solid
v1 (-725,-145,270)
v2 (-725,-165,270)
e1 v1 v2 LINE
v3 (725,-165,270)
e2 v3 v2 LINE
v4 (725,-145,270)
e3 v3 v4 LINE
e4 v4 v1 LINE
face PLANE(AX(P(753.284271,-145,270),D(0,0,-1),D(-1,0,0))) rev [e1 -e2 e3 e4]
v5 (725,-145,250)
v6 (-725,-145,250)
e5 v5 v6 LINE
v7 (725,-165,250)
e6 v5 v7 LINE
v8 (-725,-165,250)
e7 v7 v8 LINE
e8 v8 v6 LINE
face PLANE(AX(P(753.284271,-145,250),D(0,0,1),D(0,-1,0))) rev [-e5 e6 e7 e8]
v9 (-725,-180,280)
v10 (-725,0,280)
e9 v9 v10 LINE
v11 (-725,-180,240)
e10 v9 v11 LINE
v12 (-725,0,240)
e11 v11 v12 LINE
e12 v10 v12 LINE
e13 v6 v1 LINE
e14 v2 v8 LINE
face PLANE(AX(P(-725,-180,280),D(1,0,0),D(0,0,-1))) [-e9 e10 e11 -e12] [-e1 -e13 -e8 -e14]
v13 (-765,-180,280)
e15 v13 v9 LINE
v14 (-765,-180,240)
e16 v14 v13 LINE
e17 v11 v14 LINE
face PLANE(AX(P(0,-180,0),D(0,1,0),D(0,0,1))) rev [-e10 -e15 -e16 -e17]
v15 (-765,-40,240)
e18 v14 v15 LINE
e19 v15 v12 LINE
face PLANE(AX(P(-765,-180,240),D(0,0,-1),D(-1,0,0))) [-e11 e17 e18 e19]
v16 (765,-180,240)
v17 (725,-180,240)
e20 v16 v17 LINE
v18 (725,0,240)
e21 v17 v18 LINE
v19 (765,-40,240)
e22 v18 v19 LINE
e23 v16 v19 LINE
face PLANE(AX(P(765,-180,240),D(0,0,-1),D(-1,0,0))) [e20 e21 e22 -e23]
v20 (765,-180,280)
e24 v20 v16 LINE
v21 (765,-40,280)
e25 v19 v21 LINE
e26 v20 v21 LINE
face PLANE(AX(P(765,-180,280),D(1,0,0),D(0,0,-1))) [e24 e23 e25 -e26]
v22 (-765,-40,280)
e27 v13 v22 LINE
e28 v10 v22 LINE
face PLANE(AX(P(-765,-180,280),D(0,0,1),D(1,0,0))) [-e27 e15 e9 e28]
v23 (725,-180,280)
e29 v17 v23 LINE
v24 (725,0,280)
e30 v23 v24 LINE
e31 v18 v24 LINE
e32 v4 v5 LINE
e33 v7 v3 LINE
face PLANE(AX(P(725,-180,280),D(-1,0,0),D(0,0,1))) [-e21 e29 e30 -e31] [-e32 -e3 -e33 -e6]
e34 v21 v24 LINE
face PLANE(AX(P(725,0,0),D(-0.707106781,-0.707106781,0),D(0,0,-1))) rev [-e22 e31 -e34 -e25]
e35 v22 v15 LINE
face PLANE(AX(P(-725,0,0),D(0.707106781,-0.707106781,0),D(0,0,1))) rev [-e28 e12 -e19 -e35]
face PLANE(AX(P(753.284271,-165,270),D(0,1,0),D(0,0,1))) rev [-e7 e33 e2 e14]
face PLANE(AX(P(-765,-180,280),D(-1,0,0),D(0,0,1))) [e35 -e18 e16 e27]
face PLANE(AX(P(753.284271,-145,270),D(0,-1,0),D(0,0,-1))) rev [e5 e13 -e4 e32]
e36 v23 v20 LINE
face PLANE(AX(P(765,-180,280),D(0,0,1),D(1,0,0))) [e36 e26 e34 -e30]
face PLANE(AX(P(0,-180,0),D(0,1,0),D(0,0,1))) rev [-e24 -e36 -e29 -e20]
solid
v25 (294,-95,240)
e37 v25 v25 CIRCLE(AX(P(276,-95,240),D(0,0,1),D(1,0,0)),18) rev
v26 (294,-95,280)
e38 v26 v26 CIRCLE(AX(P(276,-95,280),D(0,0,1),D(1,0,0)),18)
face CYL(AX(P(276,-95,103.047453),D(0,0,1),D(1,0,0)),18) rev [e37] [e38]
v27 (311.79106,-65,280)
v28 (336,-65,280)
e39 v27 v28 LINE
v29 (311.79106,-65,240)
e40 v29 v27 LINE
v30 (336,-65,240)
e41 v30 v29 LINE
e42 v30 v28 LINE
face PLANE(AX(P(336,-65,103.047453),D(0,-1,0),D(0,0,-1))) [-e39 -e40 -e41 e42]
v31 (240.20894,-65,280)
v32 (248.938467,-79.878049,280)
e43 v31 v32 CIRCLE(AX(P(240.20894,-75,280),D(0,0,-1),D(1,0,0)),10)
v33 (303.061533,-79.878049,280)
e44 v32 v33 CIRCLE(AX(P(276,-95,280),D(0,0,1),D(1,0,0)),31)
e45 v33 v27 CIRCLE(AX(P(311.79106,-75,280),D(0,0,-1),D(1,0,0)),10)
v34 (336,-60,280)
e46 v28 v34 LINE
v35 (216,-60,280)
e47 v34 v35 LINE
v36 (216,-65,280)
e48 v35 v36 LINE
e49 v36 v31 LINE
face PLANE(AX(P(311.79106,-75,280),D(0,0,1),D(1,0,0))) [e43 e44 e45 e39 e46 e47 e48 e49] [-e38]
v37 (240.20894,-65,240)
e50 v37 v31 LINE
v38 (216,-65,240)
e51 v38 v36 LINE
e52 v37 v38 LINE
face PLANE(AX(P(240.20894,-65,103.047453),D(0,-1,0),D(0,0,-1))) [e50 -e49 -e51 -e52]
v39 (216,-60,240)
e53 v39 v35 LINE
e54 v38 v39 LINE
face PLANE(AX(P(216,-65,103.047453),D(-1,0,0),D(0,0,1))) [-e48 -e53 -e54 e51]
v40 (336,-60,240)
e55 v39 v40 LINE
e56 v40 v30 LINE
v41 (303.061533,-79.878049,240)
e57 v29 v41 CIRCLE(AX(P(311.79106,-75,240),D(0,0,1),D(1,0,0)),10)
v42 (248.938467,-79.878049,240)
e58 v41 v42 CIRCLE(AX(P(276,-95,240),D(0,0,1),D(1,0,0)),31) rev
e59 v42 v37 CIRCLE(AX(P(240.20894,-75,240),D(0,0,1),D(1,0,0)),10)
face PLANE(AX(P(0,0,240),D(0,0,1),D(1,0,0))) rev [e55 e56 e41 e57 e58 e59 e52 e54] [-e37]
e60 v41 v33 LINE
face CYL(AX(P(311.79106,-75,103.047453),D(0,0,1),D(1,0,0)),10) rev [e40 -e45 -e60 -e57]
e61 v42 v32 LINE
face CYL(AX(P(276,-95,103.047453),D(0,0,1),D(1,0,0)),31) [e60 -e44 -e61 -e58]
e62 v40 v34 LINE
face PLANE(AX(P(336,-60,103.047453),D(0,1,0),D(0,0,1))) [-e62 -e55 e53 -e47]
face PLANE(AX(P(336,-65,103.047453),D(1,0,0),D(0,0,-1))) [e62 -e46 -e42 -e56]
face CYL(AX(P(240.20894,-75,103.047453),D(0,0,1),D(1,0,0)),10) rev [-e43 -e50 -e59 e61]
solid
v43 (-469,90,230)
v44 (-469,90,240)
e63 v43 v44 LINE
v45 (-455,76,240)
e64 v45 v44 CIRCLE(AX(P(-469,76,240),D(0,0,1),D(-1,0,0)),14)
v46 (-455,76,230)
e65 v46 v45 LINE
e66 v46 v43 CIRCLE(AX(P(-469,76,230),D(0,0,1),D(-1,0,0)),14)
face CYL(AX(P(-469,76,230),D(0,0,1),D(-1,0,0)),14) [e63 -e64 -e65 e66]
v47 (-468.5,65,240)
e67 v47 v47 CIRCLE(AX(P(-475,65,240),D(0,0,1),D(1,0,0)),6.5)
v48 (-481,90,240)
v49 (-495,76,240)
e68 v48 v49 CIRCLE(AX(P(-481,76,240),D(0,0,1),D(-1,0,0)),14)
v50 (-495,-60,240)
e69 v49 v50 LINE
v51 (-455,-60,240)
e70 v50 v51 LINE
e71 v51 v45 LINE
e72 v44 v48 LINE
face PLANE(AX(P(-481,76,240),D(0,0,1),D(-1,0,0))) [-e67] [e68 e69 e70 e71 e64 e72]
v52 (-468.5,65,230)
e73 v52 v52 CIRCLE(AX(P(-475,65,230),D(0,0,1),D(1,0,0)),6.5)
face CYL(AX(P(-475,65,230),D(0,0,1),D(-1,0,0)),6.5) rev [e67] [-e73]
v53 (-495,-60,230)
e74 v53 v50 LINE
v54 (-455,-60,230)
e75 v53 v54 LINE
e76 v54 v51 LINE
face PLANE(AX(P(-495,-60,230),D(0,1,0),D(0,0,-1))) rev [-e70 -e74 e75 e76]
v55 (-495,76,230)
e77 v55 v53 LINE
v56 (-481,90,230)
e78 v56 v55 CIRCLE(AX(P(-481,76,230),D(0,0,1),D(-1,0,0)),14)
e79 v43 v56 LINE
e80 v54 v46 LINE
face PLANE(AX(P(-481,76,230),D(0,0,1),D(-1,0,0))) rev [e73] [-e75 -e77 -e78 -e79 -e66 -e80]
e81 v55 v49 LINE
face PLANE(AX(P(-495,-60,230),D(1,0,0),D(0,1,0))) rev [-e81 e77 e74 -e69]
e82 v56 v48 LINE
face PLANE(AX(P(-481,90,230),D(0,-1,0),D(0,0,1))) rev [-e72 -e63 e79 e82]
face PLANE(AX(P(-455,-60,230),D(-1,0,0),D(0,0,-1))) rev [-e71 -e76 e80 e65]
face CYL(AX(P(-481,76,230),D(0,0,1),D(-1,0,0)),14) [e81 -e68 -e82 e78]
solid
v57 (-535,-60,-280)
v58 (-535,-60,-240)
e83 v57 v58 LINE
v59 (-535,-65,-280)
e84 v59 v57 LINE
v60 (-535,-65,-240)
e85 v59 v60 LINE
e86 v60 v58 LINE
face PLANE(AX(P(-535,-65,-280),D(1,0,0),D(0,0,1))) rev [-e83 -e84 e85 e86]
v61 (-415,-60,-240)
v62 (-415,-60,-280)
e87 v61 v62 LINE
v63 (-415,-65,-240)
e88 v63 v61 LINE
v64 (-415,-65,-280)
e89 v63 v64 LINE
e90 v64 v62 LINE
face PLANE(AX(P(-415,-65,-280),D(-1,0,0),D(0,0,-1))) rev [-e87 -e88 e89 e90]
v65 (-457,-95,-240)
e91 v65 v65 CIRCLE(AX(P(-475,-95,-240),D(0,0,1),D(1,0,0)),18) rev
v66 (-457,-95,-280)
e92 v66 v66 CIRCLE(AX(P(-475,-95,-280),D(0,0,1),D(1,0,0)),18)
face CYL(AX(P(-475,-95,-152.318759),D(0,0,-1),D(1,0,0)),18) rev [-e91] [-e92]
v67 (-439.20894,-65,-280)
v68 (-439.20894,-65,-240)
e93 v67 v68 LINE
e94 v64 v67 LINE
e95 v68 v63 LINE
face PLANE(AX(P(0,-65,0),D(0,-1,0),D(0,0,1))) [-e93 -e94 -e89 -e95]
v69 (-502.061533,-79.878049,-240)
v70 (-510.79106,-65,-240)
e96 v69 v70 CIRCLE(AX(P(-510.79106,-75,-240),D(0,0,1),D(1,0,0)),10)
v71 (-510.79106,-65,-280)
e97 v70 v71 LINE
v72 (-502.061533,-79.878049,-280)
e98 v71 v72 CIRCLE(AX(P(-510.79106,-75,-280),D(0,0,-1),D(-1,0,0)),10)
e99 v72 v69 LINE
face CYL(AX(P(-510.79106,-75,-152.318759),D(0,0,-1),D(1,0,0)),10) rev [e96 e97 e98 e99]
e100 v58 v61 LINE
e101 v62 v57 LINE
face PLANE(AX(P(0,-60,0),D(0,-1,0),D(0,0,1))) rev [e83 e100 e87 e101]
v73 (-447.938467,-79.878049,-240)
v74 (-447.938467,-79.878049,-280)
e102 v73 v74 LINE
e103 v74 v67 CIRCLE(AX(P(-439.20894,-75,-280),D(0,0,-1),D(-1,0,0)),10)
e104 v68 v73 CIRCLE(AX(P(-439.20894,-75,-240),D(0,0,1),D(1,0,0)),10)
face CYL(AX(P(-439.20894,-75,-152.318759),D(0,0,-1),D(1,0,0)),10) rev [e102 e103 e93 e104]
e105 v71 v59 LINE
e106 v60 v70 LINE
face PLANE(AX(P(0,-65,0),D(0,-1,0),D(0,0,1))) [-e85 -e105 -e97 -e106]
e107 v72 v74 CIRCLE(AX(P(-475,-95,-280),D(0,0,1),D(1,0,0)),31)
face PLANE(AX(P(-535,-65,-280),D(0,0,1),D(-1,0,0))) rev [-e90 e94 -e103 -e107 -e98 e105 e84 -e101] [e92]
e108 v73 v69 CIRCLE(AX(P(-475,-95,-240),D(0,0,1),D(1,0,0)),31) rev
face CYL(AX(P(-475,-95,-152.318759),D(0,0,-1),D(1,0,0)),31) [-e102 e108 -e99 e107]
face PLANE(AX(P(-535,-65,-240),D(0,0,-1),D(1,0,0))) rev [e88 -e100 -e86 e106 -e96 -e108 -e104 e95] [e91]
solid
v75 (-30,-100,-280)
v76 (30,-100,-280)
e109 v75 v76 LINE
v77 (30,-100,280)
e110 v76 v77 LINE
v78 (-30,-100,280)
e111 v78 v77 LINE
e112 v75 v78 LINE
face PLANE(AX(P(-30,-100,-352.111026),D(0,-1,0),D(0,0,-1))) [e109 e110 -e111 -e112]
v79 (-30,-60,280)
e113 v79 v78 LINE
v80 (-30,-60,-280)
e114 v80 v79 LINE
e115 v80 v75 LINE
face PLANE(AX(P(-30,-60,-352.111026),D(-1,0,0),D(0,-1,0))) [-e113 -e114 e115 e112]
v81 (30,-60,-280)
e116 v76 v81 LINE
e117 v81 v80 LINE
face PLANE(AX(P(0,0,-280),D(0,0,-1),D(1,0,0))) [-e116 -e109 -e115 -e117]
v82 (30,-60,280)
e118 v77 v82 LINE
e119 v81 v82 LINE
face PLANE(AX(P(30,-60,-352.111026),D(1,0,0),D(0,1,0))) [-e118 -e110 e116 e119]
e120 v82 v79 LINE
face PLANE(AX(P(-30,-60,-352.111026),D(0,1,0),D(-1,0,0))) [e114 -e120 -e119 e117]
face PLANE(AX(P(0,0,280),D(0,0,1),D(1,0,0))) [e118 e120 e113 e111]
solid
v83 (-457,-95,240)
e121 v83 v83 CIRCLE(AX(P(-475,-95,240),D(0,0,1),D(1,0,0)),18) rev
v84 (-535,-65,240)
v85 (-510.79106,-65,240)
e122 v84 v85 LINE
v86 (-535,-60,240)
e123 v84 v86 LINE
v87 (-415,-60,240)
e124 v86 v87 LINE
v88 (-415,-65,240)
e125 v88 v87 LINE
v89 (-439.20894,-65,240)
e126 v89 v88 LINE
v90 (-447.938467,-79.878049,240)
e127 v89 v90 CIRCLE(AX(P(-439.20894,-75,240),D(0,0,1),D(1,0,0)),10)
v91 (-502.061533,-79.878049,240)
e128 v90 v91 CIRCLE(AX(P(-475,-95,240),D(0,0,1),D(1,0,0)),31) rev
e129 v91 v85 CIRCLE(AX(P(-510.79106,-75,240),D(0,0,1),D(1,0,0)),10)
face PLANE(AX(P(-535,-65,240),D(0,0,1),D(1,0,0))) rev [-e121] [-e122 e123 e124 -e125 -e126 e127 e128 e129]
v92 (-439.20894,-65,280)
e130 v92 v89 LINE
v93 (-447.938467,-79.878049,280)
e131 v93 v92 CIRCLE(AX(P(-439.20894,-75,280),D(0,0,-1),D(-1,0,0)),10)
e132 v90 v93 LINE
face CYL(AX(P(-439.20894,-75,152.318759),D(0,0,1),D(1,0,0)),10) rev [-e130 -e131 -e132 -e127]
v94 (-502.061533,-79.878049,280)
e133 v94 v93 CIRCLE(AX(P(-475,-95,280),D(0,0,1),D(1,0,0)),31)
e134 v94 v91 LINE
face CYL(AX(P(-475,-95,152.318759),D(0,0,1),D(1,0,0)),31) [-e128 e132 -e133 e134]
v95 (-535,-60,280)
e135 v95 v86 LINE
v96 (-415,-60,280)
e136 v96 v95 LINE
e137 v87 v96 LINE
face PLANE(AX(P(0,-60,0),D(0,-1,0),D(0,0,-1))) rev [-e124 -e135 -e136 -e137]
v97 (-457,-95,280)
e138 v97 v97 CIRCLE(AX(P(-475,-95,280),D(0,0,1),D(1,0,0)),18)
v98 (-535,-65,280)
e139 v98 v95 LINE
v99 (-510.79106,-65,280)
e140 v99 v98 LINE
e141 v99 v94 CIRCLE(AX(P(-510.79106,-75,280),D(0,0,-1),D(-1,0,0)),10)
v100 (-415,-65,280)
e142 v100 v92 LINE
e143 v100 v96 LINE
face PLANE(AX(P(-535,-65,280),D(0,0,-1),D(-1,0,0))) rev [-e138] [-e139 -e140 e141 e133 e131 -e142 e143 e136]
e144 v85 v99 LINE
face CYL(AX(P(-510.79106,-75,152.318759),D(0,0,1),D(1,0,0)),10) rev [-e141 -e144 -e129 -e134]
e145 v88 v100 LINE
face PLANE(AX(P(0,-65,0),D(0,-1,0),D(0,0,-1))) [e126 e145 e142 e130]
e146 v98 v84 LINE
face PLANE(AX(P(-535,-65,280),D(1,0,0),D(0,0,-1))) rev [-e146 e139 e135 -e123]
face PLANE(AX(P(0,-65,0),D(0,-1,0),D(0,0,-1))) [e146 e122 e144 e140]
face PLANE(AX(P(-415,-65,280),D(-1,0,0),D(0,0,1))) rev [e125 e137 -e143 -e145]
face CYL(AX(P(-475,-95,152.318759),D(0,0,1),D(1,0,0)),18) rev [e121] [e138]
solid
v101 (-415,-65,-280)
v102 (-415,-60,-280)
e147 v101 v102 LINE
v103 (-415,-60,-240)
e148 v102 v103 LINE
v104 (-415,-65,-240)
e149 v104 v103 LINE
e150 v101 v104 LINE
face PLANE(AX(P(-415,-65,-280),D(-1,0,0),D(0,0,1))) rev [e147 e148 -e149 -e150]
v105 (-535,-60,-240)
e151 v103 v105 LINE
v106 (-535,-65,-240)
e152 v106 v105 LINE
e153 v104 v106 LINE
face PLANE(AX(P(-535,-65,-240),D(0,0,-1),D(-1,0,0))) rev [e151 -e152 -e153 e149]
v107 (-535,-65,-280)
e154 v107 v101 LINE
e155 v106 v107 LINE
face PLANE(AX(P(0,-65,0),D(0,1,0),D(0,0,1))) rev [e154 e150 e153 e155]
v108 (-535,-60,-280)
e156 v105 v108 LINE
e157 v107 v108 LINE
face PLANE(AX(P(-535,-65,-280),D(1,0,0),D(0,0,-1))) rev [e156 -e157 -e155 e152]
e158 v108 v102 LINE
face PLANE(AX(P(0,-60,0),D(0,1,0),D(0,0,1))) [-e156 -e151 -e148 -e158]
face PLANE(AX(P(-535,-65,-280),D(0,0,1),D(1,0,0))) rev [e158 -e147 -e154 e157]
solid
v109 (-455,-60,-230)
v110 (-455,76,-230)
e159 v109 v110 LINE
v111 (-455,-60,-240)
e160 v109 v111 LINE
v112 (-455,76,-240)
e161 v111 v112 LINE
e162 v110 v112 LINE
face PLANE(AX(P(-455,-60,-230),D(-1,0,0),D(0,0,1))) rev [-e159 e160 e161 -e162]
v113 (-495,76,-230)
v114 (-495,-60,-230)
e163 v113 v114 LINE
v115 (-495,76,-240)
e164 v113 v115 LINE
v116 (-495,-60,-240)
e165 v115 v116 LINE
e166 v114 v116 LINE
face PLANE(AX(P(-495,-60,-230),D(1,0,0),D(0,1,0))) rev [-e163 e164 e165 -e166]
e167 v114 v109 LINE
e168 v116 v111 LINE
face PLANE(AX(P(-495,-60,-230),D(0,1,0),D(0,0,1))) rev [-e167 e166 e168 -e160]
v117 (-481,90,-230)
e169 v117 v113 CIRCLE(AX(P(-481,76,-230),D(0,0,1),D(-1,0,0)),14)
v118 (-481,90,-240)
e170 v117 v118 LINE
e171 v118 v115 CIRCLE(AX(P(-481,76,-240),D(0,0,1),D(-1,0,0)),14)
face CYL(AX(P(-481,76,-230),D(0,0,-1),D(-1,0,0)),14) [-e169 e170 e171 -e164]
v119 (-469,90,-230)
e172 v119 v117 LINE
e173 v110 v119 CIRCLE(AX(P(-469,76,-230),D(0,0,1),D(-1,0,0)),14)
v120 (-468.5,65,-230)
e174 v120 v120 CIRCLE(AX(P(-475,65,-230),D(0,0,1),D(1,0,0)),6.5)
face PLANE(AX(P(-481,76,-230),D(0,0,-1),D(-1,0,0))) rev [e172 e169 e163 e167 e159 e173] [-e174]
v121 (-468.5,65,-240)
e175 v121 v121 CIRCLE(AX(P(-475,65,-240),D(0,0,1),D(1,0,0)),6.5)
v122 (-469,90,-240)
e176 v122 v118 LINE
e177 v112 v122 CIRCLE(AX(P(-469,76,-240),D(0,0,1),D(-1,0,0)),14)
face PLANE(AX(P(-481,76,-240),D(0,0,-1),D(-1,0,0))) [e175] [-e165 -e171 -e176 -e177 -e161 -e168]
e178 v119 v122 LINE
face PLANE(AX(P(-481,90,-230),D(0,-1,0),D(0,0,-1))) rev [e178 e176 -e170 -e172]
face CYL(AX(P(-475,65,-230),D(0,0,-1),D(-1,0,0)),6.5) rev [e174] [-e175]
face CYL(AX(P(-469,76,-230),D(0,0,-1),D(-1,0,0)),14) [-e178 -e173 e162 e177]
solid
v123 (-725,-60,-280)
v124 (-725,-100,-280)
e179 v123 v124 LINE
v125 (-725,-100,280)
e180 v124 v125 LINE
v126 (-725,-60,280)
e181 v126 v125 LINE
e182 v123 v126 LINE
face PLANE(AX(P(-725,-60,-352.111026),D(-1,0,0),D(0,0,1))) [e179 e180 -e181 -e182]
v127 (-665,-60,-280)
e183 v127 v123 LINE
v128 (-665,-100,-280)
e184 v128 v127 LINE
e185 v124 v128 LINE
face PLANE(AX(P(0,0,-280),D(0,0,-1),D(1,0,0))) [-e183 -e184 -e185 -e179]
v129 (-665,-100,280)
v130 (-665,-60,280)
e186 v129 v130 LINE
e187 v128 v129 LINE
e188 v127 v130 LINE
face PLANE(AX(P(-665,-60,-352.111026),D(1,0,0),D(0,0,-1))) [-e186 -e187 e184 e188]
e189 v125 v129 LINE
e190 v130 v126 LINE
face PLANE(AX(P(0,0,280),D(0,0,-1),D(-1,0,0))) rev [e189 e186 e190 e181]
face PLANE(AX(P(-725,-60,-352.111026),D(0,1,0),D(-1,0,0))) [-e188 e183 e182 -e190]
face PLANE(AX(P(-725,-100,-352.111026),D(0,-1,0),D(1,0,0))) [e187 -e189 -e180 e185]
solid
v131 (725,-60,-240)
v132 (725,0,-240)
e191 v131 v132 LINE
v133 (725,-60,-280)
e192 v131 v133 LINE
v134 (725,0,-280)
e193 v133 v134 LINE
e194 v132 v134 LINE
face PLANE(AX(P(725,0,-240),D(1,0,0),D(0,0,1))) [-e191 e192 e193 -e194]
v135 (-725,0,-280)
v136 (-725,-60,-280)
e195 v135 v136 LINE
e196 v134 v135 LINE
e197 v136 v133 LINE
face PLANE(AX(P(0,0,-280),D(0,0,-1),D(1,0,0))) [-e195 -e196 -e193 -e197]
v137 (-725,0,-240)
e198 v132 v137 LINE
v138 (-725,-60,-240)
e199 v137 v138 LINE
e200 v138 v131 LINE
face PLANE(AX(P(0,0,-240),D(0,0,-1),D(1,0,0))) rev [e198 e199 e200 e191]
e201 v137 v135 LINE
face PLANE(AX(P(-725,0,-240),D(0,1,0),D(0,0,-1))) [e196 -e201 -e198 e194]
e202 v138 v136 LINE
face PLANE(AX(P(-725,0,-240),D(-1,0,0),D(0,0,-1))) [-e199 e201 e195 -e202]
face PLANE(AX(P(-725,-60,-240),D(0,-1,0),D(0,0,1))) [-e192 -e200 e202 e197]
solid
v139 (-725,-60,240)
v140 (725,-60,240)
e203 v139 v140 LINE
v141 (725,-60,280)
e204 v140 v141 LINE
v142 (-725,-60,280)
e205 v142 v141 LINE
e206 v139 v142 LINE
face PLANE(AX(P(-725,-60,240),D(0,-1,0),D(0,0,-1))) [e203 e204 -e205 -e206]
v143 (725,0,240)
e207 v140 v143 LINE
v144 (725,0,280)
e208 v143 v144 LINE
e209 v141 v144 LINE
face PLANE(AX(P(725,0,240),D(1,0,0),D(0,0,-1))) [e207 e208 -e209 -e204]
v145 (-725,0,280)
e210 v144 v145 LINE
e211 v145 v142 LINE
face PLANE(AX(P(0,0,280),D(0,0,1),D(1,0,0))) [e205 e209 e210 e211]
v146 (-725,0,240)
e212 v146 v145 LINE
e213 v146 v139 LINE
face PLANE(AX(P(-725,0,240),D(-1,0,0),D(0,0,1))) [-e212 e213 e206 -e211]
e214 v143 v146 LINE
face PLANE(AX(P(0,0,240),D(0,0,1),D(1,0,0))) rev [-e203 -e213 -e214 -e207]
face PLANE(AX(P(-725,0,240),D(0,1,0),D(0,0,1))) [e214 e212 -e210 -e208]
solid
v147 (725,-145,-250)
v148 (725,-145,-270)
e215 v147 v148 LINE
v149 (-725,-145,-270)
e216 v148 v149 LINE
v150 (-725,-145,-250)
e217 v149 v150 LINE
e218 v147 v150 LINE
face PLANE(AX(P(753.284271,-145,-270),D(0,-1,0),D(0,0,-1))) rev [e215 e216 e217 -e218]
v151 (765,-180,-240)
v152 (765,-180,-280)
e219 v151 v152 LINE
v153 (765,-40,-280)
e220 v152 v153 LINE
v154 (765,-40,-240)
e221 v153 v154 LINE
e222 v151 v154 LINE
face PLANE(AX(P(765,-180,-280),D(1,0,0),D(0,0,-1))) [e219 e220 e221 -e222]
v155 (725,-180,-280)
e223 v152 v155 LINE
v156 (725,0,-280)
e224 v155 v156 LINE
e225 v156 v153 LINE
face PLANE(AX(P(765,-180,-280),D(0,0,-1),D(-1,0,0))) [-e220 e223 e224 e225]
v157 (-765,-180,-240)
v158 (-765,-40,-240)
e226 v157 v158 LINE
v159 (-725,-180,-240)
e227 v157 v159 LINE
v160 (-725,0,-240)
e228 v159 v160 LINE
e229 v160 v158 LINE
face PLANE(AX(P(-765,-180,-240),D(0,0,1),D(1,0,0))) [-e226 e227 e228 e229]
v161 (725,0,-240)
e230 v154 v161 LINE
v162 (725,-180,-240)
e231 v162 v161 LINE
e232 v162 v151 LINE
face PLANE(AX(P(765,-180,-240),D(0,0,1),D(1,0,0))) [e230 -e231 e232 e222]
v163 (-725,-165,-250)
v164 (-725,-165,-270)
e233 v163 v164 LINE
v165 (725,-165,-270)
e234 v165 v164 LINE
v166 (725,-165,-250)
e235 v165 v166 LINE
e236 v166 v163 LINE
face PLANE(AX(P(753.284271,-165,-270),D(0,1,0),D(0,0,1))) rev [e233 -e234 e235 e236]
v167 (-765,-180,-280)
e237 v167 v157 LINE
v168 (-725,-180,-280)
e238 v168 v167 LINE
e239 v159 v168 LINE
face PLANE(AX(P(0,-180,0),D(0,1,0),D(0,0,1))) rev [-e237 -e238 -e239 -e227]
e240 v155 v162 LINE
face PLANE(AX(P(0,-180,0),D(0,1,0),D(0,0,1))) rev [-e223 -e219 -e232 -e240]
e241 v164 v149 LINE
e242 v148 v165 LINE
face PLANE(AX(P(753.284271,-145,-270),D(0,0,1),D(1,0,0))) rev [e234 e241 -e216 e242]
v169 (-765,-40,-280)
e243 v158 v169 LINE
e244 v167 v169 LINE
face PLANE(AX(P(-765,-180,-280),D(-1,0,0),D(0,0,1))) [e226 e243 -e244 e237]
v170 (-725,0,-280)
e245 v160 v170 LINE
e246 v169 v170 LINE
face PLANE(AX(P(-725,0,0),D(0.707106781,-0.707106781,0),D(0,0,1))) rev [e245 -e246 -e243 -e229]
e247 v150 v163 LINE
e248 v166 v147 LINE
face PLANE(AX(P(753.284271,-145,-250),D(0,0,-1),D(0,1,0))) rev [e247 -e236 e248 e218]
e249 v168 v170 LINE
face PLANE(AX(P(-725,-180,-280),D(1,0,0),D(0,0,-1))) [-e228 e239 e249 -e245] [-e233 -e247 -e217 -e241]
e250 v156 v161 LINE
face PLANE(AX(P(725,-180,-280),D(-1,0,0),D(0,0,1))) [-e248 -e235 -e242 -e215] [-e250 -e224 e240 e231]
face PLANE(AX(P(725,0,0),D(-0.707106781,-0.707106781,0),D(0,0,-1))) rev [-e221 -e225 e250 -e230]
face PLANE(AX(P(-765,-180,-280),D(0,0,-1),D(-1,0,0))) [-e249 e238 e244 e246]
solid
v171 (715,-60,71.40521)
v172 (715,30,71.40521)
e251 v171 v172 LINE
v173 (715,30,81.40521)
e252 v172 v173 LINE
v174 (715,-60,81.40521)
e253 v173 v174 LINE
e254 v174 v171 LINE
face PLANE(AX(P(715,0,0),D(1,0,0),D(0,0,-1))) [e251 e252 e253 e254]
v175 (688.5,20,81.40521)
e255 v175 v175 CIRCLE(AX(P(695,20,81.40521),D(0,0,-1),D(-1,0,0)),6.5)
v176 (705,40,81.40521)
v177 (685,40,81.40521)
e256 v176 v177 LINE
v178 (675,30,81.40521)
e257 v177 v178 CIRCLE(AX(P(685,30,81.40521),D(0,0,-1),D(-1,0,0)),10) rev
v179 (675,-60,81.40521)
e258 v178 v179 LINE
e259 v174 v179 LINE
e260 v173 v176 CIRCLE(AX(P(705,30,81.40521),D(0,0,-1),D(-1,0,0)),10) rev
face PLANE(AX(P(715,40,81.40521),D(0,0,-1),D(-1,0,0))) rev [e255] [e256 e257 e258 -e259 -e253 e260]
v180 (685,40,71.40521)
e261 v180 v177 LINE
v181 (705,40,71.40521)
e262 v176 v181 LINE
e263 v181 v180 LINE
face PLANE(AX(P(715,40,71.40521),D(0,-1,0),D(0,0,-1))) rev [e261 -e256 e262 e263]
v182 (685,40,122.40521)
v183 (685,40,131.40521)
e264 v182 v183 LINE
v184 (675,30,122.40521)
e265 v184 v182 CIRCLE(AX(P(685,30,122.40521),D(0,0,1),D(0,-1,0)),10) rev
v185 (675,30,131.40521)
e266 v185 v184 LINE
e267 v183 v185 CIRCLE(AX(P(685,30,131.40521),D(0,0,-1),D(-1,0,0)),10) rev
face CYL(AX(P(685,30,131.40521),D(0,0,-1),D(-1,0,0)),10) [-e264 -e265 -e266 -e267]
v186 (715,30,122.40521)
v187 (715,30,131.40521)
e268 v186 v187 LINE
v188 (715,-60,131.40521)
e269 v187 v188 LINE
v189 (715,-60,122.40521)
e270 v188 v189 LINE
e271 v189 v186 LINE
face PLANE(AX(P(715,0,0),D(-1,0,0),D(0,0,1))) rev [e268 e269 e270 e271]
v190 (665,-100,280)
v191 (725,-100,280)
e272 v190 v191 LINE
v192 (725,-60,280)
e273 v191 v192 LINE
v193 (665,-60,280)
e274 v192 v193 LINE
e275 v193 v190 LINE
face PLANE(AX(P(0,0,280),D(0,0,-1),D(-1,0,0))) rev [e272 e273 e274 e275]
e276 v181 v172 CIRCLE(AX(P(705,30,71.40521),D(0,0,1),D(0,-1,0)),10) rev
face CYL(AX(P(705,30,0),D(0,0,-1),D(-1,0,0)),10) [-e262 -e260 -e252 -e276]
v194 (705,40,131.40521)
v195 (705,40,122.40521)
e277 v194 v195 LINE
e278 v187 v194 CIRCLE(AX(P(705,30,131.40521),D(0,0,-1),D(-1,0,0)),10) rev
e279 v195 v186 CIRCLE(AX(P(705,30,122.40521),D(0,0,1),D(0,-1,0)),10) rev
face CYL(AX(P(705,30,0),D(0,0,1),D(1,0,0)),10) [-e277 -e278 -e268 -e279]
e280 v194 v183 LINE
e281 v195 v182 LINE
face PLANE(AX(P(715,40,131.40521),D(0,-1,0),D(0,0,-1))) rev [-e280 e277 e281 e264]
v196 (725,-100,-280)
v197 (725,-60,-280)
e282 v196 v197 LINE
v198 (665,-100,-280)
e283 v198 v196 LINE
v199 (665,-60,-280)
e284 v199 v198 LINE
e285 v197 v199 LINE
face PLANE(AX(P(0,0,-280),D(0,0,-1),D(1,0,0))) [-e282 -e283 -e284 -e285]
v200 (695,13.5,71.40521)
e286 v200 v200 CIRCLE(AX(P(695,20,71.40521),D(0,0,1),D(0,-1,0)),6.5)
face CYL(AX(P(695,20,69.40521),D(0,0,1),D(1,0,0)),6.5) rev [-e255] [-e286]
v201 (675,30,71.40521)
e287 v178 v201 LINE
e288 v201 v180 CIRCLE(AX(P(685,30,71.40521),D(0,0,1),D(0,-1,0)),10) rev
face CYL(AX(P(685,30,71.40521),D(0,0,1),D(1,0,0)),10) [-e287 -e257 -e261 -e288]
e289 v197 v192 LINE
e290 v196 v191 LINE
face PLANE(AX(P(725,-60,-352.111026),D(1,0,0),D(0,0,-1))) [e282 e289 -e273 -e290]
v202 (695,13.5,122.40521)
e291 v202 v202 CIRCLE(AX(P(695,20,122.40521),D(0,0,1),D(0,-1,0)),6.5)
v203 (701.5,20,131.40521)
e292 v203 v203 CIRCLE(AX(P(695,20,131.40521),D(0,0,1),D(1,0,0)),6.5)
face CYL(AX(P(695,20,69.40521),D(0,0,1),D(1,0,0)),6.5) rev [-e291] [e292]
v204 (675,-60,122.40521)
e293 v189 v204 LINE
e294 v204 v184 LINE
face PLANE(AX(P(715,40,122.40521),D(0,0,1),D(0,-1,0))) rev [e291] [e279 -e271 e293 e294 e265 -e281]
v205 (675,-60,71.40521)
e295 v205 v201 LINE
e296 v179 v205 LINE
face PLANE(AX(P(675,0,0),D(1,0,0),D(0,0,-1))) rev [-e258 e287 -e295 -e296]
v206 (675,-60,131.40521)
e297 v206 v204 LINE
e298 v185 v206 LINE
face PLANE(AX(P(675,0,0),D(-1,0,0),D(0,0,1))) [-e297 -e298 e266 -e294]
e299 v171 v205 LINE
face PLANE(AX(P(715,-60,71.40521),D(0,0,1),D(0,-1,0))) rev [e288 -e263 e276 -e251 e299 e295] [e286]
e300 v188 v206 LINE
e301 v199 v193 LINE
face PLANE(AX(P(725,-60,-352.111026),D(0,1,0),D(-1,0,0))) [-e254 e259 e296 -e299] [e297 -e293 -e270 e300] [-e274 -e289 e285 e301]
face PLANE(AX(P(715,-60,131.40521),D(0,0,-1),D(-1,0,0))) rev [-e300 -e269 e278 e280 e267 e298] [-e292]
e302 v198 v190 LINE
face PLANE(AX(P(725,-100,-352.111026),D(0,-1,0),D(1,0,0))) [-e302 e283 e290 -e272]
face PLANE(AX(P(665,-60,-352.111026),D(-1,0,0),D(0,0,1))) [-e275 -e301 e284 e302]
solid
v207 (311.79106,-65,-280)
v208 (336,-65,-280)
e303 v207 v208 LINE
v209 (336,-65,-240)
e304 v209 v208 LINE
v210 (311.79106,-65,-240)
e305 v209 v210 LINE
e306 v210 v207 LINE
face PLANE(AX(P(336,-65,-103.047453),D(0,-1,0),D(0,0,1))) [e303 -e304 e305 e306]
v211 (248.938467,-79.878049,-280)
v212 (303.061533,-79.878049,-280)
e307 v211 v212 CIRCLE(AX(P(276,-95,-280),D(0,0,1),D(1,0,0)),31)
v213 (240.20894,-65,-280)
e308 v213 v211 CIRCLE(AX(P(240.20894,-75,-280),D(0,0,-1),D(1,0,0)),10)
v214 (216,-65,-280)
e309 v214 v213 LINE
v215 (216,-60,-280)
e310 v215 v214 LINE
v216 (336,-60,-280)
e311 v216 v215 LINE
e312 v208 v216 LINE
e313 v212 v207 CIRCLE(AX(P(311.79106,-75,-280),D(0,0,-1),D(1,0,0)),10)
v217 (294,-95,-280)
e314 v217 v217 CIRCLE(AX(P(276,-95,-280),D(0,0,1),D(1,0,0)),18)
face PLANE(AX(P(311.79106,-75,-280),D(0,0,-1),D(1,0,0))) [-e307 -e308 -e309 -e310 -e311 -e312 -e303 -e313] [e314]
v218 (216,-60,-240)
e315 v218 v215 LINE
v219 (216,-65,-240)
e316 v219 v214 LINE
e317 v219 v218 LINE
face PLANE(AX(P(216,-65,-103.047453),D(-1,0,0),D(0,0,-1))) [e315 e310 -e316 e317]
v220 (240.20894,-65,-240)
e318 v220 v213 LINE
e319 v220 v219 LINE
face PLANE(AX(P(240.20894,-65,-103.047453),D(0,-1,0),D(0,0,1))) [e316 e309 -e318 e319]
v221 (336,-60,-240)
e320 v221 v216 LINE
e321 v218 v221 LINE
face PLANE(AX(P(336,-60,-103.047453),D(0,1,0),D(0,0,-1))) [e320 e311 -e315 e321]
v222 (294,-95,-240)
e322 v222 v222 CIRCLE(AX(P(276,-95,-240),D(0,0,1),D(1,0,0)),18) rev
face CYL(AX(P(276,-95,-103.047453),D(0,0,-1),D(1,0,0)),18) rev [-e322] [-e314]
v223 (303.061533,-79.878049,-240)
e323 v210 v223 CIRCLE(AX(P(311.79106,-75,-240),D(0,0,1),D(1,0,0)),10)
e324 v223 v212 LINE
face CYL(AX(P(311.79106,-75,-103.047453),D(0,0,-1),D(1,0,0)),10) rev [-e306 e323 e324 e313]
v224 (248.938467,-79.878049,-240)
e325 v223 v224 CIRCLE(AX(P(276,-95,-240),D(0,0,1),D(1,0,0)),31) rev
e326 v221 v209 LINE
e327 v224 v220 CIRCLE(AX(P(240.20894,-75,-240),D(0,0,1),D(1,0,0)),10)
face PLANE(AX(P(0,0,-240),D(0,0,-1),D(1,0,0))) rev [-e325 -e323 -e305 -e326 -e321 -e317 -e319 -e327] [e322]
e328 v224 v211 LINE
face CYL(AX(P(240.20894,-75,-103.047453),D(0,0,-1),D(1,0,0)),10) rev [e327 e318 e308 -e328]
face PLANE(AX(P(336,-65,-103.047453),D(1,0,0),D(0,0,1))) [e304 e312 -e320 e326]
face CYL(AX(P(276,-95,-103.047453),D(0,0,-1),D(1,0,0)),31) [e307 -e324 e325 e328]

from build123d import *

# Parameters (mm, degrees)
SKETCH1_W             = 40
SKETCH1_H             = 40
BOSS_EXTRUDE1_DEPTH   = 180
BOSS_EXTRUDE1_2_DEPTH = 180
BOSS_EXTRUDE1_3_DEPTH = 180
BOSS_EXTRUDE1_4_DEPTH = 180
CHAMFER1_SIZE         = 40
CHAMFER2_SIZE         = 40
CHAMFER3_SIZE         = 40
CHAMFER4_SIZE         = 40
SKETCH2_W             = 1450
SKETCH2_H             = 60
BOSS_EXTRUDE2_DEPTH   = 40
SKETCH3_W             = 60
SKETCH3_H             = 40
BOSS_EXTRUDE3_DEPTH   = 560
BOSS_EXTRUDE3_2_DEPTH = 560
BOSS_EXTRUDE3_3_DEPTH = 560
SKETCH4_W             = 20
SKETCH4_H             = 20
BOSS_EXTRUDE4_DEPTH   = 1450
SKETCH5_R             = 6.5
BOSS_EXTRUDE5_DEPTH   = 10
SKETCH6_W             = 120
SKETCH6_H             = 40
BOSS_EXTRUDE6_DEPTH   = 5
BOSS_EXTRUDE6_2_DEPTH = 5
SKETCH7_R             = 31
SKETCH7_R_2           = 18
BOSS_EXTRUDE7_DEPTH   = 40
FILLET1_R             = 10
SKETCH9_R             = 18
BOSS_EXTRUDE8_DEPTH   = 40
SKETCH10_W            = 10
SKETCH10_H            = 100
SKETCH10_W_2          = 9
BOSS_EXTRUDE9_DEPTH   = 20
FILLET2_R             = 10
SKETCH11_R            = 6.5
CUT_EXTRUDE1_DEPTH    = 62


with BuildPart() as part:
    # Sketch1 → Boss-Extrude1 (new body)
    with BuildSketch(Plane(origin=(0, 0, 0), x_dir=(1, 0, 0), z_dir=(0, 1, 0))):
        with Locations((-745, 260)):
            Rectangle(SKETCH1_W, SKETCH1_H)
    extrude(amount=-BOSS_EXTRUDE1_DEPTH)

    # Chamfer1
    chamfer1_edges = [part.edges().sort_by_distance(p)[0] for p in [
        (-765, 0, -260),
    ]]
    chamfer(chamfer1_edges, length=CHAMFER1_SIZE - 0.0001)  # a hair under: the kernel refuses the full size



with BuildPart() as body_2:
    # Sketch1 → Boss-Extrude1 2 (new body)
    with BuildSketch(Plane(origin=(0, 0, 0), x_dir=(1, 0, 0), z_dir=(0, 1, 0))):
        with Locations((-745, -260)):
            Rectangle(SKETCH1_W, SKETCH1_H)
    extrude(amount=-BOSS_EXTRUDE1_2_DEPTH)

    # Chamfer2
    chamfer2_edges = [body_2.edges().sort_by_distance(p)[0] for p in [
        (-765, 0, 260),
    ]]
    chamfer(chamfer2_edges, length=CHAMFER2_SIZE - 0.0001)  # a hair under: the kernel refuses the full size


with BuildPart() as body_3:
    # Sketch1 → Boss-Extrude1 3 (new body)
    with BuildSketch(Plane(origin=(0, 0, 0), x_dir=(1, 0, 0), z_dir=(0, 1, 0))):
        with Locations((745, -260)):
            Rectangle(SKETCH1_W, SKETCH1_H)
    extrude(amount=-BOSS_EXTRUDE1_3_DEPTH)

    # Chamfer4
    chamfer4_edges = [body_3.edges().sort_by_distance(p)[0] for p in [
        (765, 0, 260),
    ]]
    chamfer(chamfer4_edges, length=CHAMFER4_SIZE - 0.0001)  # a hair under: the kernel refuses the full size


with BuildPart() as body_4:
    # Sketch1 → Boss-Extrude1 4 (new body)
    with BuildSketch(Plane(origin=(0, 0, 0), x_dir=(1, 0, 0), z_dir=(0, 1, 0))):
        with Locations((745, 260)):
            Rectangle(SKETCH1_W, SKETCH1_H)
    extrude(amount=-BOSS_EXTRUDE1_4_DEPTH)

    # Chamfer3
    chamfer3_edges = [body_4.edges().sort_by_distance(p)[0] for p in [
        (765, 0, -260),
    ]]
    chamfer(chamfer3_edges, length=CHAMFER3_SIZE - 0.0001)  # a hair under: the kernel refuses the full size


with BuildPart() as body_5:
    # Sketch2 → Boss-Extrude2 (new body)
    with BuildSketch(Plane.XY.offset(280)):
        with Locations((0, -30)):
            Rectangle(SKETCH2_W, SKETCH2_H)
    extrude(amount=-BOSS_EXTRUDE2_DEPTH)


with BuildPart() as body_6:
    # Mirror2: mirrored copy
    add(body_5.part.mirror(Plane.XY))


with BuildPart() as body_7:
    # Sketch3 → Boss-Extrude3 (new body)
    with BuildSketch(Plane.XY.offset(280)):
        with Locations((695, -80)):
            Rectangle(SKETCH3_W, SKETCH3_H)
    extrude(amount=-BOSS_EXTRUDE3_DEPTH)

    # Sketch10 → Boss-Extrude9 (add, symmetric)
    with BuildSketch(Plane(origin=(695, 0, 0), x_dir=(0, 0, -1), z_dir=(1, 0, 0))):
        with Locations((-76.405210322, -10)):
            Rectangle(SKETCH10_W, SKETCH10_H)
        with Locations((-126.905210322, -10)):
            Rectangle(SKETCH10_W_2, SKETCH10_H)
    extrude(amount=BOSS_EXTRUDE9_DEPTH, both=True)

    # Fillet2
    fillet2_edges = [body_7.edges().sort_by_distance(p)[0] for p in [
        (675, 40, 76.405210322),
        (715, 40, 76.405210322),
        (675, 40, 126.905210322),
        (715, 40, 126.905210322),
    ]]
    fillet(fillet2_edges, radius=FILLET2_R)

    # Sketch11 → Cut-Extrude1 (cut)
    with BuildSketch(Plane.XY.offset(131.405210322)):
        with Locations((695, 20)):
            Circle(SKETCH11_R)
    extrude(amount=-CUT_EXTRUDE1_DEPTH, mode=Mode.SUBTRACT)


with BuildPart() as body_8:
    # Sketch3 → Boss-Extrude3 2 (new body)
    with BuildSketch(Plane.XY.offset(280)):
        with Locations((-695, -80)):
            Rectangle(SKETCH3_W, SKETCH3_H)
    extrude(amount=-BOSS_EXTRUDE3_2_DEPTH)


with BuildPart() as body_9:
    # Sketch3 → Boss-Extrude3 3 (new body)
    with BuildSketch(Plane.XY.offset(280)):
        with Locations((0, -80)):
            Rectangle(SKETCH3_W, SKETCH3_H)
    extrude(amount=-BOSS_EXTRUDE3_3_DEPTH)


with BuildPart() as part_1:
    add(part.part)

    add(body_2.part)  # Boss-Extrude4 merges body 2

    add(body_3.part)  # Boss-Extrude4 merges body 3

    add(body_4.part)  # Boss-Extrude4 merges body 4
    # Sketch4 → Boss-Extrude4 (add)
    with BuildSketch(Plane(origin=(-725, 0, 0), x_dir=(0, 0, -1), z_dir=(1, 0, 0))):
        with Locations((-260, -155)):
            Rectangle(SKETCH4_W, SKETCH4_H)
        with Locations((260, -155)):
            Rectangle(SKETCH4_W, SKETCH4_H)
    extrude(amount=BOSS_EXTRUDE4_DEPTH)


with BuildPart() as body_7_2:
    # Sketch5 → Boss-Extrude5 (new body)
    with BuildSketch(Plane.XY.offset(-240)):
        with BuildLine():
            Line((-495, -60), (-455, -60))
            Line((-455, -60), (-455, 76))
            ThreePointArc((-455, 76), (-459.100505063, 85.899494937), (-469, 90))
            Line((-469, 90), (-481, 90))
            ThreePointArc((-481, 90), (-490.899494937, 85.899494937), (-495, 76))
            Line((-495, 76), (-495, -60))
        make_face()
        with Locations((-475, 65)):
            Circle(SKETCH5_R, mode=Mode.SUBTRACT)
    extrude(amount=BOSS_EXTRUDE5_DEPTH)


with BuildPart() as body_8_2:
    # Mirror4: mirrored copy
    add(body_7_2.part.mirror(Plane.XY))


with BuildPart() as body_9_2:
    # Sketch6 → Boss-Extrude6 (new body)
    with BuildSketch(Plane.XZ.offset(60)):
        with Locations((-475, 260)):
            Rectangle(SKETCH6_W, SKETCH6_H)
    extrude(amount=BOSS_EXTRUDE6_DEPTH)

    # Sketch7 → Boss-Extrude7 (add)
    with BuildSketch(Plane.XY.offset(280)):
        with Locations((-475, -95)):
            Circle(SKETCH7_R)
        with Locations((-475, -95)):
            Circle(SKETCH7_R_2, mode=Mode.SUBTRACT)
    extrude(amount=-BOSS_EXTRUDE7_DEPTH)

    # Fillet1
    fillet1_edges = [body_9_2.edges().sort_by_distance(p)[0] for p in [
        (-482.810249676, -65, 260),
        (-467.189750324, -65, 260),
    ]]
    fillet(fillet1_edges, radius=FILLET1_R)


with BuildPart() as body_10:
    # Sketch6 → Boss-Extrude6 2 (new body)
    with BuildSketch(Plane.XZ.offset(60)):
        with Locations((-475, -260)):
            Rectangle(SKETCH6_W, SKETCH6_H)
    extrude(amount=BOSS_EXTRUDE6_2_DEPTH)


with BuildPart() as body_11:
    # Mirror6: mirrored copy
    add(body_9_2.part.mirror(Plane.XY))


with BuildPart() as body_12:
    # Sketch9 → Boss-Extrude8 (new body)
    with BuildSketch(Plane.XY.offset(280)):
        with BuildLine():
            Line((336, -65), (336, -60))
            Line((336, -60), (216, -60))
            Line((216, -60), (216, -65))
            Line((216, -65), (240.208939664, -65))
            ThreePointArc((240.208939664, -65), (248.833917571, -69.939391727), (248.938466575, -79.87804878))
            ThreePointArc((248.938466575, -79.87804878), (276, -126), (303.061533425, -79.87804878))
            ThreePointArc((303.061533425, -79.87804878), (303.166082429, -69.939391727), (311.791060336, -65))
            Line((311.791060336, -65), (336, -65))
        make_face()
        with Locations((276, -95)):
            Circle(SKETCH9_R, mode=Mode.SUBTRACT)
    extrude(amount=-BOSS_EXTRUDE8_DEPTH)


with BuildPart() as body_13:
    # Mirror7: mirrored copy
    add(body_12.part.mirror(Plane.XY))


solid = Compound([body_5.part, body_6.part, body_7.part, body_8.part, body_9.part, part_1.part, body_7_2.part, body_8_2.part, body_9_2.part, body_10.part, body_11.part, body_12.part, body_13.part])
